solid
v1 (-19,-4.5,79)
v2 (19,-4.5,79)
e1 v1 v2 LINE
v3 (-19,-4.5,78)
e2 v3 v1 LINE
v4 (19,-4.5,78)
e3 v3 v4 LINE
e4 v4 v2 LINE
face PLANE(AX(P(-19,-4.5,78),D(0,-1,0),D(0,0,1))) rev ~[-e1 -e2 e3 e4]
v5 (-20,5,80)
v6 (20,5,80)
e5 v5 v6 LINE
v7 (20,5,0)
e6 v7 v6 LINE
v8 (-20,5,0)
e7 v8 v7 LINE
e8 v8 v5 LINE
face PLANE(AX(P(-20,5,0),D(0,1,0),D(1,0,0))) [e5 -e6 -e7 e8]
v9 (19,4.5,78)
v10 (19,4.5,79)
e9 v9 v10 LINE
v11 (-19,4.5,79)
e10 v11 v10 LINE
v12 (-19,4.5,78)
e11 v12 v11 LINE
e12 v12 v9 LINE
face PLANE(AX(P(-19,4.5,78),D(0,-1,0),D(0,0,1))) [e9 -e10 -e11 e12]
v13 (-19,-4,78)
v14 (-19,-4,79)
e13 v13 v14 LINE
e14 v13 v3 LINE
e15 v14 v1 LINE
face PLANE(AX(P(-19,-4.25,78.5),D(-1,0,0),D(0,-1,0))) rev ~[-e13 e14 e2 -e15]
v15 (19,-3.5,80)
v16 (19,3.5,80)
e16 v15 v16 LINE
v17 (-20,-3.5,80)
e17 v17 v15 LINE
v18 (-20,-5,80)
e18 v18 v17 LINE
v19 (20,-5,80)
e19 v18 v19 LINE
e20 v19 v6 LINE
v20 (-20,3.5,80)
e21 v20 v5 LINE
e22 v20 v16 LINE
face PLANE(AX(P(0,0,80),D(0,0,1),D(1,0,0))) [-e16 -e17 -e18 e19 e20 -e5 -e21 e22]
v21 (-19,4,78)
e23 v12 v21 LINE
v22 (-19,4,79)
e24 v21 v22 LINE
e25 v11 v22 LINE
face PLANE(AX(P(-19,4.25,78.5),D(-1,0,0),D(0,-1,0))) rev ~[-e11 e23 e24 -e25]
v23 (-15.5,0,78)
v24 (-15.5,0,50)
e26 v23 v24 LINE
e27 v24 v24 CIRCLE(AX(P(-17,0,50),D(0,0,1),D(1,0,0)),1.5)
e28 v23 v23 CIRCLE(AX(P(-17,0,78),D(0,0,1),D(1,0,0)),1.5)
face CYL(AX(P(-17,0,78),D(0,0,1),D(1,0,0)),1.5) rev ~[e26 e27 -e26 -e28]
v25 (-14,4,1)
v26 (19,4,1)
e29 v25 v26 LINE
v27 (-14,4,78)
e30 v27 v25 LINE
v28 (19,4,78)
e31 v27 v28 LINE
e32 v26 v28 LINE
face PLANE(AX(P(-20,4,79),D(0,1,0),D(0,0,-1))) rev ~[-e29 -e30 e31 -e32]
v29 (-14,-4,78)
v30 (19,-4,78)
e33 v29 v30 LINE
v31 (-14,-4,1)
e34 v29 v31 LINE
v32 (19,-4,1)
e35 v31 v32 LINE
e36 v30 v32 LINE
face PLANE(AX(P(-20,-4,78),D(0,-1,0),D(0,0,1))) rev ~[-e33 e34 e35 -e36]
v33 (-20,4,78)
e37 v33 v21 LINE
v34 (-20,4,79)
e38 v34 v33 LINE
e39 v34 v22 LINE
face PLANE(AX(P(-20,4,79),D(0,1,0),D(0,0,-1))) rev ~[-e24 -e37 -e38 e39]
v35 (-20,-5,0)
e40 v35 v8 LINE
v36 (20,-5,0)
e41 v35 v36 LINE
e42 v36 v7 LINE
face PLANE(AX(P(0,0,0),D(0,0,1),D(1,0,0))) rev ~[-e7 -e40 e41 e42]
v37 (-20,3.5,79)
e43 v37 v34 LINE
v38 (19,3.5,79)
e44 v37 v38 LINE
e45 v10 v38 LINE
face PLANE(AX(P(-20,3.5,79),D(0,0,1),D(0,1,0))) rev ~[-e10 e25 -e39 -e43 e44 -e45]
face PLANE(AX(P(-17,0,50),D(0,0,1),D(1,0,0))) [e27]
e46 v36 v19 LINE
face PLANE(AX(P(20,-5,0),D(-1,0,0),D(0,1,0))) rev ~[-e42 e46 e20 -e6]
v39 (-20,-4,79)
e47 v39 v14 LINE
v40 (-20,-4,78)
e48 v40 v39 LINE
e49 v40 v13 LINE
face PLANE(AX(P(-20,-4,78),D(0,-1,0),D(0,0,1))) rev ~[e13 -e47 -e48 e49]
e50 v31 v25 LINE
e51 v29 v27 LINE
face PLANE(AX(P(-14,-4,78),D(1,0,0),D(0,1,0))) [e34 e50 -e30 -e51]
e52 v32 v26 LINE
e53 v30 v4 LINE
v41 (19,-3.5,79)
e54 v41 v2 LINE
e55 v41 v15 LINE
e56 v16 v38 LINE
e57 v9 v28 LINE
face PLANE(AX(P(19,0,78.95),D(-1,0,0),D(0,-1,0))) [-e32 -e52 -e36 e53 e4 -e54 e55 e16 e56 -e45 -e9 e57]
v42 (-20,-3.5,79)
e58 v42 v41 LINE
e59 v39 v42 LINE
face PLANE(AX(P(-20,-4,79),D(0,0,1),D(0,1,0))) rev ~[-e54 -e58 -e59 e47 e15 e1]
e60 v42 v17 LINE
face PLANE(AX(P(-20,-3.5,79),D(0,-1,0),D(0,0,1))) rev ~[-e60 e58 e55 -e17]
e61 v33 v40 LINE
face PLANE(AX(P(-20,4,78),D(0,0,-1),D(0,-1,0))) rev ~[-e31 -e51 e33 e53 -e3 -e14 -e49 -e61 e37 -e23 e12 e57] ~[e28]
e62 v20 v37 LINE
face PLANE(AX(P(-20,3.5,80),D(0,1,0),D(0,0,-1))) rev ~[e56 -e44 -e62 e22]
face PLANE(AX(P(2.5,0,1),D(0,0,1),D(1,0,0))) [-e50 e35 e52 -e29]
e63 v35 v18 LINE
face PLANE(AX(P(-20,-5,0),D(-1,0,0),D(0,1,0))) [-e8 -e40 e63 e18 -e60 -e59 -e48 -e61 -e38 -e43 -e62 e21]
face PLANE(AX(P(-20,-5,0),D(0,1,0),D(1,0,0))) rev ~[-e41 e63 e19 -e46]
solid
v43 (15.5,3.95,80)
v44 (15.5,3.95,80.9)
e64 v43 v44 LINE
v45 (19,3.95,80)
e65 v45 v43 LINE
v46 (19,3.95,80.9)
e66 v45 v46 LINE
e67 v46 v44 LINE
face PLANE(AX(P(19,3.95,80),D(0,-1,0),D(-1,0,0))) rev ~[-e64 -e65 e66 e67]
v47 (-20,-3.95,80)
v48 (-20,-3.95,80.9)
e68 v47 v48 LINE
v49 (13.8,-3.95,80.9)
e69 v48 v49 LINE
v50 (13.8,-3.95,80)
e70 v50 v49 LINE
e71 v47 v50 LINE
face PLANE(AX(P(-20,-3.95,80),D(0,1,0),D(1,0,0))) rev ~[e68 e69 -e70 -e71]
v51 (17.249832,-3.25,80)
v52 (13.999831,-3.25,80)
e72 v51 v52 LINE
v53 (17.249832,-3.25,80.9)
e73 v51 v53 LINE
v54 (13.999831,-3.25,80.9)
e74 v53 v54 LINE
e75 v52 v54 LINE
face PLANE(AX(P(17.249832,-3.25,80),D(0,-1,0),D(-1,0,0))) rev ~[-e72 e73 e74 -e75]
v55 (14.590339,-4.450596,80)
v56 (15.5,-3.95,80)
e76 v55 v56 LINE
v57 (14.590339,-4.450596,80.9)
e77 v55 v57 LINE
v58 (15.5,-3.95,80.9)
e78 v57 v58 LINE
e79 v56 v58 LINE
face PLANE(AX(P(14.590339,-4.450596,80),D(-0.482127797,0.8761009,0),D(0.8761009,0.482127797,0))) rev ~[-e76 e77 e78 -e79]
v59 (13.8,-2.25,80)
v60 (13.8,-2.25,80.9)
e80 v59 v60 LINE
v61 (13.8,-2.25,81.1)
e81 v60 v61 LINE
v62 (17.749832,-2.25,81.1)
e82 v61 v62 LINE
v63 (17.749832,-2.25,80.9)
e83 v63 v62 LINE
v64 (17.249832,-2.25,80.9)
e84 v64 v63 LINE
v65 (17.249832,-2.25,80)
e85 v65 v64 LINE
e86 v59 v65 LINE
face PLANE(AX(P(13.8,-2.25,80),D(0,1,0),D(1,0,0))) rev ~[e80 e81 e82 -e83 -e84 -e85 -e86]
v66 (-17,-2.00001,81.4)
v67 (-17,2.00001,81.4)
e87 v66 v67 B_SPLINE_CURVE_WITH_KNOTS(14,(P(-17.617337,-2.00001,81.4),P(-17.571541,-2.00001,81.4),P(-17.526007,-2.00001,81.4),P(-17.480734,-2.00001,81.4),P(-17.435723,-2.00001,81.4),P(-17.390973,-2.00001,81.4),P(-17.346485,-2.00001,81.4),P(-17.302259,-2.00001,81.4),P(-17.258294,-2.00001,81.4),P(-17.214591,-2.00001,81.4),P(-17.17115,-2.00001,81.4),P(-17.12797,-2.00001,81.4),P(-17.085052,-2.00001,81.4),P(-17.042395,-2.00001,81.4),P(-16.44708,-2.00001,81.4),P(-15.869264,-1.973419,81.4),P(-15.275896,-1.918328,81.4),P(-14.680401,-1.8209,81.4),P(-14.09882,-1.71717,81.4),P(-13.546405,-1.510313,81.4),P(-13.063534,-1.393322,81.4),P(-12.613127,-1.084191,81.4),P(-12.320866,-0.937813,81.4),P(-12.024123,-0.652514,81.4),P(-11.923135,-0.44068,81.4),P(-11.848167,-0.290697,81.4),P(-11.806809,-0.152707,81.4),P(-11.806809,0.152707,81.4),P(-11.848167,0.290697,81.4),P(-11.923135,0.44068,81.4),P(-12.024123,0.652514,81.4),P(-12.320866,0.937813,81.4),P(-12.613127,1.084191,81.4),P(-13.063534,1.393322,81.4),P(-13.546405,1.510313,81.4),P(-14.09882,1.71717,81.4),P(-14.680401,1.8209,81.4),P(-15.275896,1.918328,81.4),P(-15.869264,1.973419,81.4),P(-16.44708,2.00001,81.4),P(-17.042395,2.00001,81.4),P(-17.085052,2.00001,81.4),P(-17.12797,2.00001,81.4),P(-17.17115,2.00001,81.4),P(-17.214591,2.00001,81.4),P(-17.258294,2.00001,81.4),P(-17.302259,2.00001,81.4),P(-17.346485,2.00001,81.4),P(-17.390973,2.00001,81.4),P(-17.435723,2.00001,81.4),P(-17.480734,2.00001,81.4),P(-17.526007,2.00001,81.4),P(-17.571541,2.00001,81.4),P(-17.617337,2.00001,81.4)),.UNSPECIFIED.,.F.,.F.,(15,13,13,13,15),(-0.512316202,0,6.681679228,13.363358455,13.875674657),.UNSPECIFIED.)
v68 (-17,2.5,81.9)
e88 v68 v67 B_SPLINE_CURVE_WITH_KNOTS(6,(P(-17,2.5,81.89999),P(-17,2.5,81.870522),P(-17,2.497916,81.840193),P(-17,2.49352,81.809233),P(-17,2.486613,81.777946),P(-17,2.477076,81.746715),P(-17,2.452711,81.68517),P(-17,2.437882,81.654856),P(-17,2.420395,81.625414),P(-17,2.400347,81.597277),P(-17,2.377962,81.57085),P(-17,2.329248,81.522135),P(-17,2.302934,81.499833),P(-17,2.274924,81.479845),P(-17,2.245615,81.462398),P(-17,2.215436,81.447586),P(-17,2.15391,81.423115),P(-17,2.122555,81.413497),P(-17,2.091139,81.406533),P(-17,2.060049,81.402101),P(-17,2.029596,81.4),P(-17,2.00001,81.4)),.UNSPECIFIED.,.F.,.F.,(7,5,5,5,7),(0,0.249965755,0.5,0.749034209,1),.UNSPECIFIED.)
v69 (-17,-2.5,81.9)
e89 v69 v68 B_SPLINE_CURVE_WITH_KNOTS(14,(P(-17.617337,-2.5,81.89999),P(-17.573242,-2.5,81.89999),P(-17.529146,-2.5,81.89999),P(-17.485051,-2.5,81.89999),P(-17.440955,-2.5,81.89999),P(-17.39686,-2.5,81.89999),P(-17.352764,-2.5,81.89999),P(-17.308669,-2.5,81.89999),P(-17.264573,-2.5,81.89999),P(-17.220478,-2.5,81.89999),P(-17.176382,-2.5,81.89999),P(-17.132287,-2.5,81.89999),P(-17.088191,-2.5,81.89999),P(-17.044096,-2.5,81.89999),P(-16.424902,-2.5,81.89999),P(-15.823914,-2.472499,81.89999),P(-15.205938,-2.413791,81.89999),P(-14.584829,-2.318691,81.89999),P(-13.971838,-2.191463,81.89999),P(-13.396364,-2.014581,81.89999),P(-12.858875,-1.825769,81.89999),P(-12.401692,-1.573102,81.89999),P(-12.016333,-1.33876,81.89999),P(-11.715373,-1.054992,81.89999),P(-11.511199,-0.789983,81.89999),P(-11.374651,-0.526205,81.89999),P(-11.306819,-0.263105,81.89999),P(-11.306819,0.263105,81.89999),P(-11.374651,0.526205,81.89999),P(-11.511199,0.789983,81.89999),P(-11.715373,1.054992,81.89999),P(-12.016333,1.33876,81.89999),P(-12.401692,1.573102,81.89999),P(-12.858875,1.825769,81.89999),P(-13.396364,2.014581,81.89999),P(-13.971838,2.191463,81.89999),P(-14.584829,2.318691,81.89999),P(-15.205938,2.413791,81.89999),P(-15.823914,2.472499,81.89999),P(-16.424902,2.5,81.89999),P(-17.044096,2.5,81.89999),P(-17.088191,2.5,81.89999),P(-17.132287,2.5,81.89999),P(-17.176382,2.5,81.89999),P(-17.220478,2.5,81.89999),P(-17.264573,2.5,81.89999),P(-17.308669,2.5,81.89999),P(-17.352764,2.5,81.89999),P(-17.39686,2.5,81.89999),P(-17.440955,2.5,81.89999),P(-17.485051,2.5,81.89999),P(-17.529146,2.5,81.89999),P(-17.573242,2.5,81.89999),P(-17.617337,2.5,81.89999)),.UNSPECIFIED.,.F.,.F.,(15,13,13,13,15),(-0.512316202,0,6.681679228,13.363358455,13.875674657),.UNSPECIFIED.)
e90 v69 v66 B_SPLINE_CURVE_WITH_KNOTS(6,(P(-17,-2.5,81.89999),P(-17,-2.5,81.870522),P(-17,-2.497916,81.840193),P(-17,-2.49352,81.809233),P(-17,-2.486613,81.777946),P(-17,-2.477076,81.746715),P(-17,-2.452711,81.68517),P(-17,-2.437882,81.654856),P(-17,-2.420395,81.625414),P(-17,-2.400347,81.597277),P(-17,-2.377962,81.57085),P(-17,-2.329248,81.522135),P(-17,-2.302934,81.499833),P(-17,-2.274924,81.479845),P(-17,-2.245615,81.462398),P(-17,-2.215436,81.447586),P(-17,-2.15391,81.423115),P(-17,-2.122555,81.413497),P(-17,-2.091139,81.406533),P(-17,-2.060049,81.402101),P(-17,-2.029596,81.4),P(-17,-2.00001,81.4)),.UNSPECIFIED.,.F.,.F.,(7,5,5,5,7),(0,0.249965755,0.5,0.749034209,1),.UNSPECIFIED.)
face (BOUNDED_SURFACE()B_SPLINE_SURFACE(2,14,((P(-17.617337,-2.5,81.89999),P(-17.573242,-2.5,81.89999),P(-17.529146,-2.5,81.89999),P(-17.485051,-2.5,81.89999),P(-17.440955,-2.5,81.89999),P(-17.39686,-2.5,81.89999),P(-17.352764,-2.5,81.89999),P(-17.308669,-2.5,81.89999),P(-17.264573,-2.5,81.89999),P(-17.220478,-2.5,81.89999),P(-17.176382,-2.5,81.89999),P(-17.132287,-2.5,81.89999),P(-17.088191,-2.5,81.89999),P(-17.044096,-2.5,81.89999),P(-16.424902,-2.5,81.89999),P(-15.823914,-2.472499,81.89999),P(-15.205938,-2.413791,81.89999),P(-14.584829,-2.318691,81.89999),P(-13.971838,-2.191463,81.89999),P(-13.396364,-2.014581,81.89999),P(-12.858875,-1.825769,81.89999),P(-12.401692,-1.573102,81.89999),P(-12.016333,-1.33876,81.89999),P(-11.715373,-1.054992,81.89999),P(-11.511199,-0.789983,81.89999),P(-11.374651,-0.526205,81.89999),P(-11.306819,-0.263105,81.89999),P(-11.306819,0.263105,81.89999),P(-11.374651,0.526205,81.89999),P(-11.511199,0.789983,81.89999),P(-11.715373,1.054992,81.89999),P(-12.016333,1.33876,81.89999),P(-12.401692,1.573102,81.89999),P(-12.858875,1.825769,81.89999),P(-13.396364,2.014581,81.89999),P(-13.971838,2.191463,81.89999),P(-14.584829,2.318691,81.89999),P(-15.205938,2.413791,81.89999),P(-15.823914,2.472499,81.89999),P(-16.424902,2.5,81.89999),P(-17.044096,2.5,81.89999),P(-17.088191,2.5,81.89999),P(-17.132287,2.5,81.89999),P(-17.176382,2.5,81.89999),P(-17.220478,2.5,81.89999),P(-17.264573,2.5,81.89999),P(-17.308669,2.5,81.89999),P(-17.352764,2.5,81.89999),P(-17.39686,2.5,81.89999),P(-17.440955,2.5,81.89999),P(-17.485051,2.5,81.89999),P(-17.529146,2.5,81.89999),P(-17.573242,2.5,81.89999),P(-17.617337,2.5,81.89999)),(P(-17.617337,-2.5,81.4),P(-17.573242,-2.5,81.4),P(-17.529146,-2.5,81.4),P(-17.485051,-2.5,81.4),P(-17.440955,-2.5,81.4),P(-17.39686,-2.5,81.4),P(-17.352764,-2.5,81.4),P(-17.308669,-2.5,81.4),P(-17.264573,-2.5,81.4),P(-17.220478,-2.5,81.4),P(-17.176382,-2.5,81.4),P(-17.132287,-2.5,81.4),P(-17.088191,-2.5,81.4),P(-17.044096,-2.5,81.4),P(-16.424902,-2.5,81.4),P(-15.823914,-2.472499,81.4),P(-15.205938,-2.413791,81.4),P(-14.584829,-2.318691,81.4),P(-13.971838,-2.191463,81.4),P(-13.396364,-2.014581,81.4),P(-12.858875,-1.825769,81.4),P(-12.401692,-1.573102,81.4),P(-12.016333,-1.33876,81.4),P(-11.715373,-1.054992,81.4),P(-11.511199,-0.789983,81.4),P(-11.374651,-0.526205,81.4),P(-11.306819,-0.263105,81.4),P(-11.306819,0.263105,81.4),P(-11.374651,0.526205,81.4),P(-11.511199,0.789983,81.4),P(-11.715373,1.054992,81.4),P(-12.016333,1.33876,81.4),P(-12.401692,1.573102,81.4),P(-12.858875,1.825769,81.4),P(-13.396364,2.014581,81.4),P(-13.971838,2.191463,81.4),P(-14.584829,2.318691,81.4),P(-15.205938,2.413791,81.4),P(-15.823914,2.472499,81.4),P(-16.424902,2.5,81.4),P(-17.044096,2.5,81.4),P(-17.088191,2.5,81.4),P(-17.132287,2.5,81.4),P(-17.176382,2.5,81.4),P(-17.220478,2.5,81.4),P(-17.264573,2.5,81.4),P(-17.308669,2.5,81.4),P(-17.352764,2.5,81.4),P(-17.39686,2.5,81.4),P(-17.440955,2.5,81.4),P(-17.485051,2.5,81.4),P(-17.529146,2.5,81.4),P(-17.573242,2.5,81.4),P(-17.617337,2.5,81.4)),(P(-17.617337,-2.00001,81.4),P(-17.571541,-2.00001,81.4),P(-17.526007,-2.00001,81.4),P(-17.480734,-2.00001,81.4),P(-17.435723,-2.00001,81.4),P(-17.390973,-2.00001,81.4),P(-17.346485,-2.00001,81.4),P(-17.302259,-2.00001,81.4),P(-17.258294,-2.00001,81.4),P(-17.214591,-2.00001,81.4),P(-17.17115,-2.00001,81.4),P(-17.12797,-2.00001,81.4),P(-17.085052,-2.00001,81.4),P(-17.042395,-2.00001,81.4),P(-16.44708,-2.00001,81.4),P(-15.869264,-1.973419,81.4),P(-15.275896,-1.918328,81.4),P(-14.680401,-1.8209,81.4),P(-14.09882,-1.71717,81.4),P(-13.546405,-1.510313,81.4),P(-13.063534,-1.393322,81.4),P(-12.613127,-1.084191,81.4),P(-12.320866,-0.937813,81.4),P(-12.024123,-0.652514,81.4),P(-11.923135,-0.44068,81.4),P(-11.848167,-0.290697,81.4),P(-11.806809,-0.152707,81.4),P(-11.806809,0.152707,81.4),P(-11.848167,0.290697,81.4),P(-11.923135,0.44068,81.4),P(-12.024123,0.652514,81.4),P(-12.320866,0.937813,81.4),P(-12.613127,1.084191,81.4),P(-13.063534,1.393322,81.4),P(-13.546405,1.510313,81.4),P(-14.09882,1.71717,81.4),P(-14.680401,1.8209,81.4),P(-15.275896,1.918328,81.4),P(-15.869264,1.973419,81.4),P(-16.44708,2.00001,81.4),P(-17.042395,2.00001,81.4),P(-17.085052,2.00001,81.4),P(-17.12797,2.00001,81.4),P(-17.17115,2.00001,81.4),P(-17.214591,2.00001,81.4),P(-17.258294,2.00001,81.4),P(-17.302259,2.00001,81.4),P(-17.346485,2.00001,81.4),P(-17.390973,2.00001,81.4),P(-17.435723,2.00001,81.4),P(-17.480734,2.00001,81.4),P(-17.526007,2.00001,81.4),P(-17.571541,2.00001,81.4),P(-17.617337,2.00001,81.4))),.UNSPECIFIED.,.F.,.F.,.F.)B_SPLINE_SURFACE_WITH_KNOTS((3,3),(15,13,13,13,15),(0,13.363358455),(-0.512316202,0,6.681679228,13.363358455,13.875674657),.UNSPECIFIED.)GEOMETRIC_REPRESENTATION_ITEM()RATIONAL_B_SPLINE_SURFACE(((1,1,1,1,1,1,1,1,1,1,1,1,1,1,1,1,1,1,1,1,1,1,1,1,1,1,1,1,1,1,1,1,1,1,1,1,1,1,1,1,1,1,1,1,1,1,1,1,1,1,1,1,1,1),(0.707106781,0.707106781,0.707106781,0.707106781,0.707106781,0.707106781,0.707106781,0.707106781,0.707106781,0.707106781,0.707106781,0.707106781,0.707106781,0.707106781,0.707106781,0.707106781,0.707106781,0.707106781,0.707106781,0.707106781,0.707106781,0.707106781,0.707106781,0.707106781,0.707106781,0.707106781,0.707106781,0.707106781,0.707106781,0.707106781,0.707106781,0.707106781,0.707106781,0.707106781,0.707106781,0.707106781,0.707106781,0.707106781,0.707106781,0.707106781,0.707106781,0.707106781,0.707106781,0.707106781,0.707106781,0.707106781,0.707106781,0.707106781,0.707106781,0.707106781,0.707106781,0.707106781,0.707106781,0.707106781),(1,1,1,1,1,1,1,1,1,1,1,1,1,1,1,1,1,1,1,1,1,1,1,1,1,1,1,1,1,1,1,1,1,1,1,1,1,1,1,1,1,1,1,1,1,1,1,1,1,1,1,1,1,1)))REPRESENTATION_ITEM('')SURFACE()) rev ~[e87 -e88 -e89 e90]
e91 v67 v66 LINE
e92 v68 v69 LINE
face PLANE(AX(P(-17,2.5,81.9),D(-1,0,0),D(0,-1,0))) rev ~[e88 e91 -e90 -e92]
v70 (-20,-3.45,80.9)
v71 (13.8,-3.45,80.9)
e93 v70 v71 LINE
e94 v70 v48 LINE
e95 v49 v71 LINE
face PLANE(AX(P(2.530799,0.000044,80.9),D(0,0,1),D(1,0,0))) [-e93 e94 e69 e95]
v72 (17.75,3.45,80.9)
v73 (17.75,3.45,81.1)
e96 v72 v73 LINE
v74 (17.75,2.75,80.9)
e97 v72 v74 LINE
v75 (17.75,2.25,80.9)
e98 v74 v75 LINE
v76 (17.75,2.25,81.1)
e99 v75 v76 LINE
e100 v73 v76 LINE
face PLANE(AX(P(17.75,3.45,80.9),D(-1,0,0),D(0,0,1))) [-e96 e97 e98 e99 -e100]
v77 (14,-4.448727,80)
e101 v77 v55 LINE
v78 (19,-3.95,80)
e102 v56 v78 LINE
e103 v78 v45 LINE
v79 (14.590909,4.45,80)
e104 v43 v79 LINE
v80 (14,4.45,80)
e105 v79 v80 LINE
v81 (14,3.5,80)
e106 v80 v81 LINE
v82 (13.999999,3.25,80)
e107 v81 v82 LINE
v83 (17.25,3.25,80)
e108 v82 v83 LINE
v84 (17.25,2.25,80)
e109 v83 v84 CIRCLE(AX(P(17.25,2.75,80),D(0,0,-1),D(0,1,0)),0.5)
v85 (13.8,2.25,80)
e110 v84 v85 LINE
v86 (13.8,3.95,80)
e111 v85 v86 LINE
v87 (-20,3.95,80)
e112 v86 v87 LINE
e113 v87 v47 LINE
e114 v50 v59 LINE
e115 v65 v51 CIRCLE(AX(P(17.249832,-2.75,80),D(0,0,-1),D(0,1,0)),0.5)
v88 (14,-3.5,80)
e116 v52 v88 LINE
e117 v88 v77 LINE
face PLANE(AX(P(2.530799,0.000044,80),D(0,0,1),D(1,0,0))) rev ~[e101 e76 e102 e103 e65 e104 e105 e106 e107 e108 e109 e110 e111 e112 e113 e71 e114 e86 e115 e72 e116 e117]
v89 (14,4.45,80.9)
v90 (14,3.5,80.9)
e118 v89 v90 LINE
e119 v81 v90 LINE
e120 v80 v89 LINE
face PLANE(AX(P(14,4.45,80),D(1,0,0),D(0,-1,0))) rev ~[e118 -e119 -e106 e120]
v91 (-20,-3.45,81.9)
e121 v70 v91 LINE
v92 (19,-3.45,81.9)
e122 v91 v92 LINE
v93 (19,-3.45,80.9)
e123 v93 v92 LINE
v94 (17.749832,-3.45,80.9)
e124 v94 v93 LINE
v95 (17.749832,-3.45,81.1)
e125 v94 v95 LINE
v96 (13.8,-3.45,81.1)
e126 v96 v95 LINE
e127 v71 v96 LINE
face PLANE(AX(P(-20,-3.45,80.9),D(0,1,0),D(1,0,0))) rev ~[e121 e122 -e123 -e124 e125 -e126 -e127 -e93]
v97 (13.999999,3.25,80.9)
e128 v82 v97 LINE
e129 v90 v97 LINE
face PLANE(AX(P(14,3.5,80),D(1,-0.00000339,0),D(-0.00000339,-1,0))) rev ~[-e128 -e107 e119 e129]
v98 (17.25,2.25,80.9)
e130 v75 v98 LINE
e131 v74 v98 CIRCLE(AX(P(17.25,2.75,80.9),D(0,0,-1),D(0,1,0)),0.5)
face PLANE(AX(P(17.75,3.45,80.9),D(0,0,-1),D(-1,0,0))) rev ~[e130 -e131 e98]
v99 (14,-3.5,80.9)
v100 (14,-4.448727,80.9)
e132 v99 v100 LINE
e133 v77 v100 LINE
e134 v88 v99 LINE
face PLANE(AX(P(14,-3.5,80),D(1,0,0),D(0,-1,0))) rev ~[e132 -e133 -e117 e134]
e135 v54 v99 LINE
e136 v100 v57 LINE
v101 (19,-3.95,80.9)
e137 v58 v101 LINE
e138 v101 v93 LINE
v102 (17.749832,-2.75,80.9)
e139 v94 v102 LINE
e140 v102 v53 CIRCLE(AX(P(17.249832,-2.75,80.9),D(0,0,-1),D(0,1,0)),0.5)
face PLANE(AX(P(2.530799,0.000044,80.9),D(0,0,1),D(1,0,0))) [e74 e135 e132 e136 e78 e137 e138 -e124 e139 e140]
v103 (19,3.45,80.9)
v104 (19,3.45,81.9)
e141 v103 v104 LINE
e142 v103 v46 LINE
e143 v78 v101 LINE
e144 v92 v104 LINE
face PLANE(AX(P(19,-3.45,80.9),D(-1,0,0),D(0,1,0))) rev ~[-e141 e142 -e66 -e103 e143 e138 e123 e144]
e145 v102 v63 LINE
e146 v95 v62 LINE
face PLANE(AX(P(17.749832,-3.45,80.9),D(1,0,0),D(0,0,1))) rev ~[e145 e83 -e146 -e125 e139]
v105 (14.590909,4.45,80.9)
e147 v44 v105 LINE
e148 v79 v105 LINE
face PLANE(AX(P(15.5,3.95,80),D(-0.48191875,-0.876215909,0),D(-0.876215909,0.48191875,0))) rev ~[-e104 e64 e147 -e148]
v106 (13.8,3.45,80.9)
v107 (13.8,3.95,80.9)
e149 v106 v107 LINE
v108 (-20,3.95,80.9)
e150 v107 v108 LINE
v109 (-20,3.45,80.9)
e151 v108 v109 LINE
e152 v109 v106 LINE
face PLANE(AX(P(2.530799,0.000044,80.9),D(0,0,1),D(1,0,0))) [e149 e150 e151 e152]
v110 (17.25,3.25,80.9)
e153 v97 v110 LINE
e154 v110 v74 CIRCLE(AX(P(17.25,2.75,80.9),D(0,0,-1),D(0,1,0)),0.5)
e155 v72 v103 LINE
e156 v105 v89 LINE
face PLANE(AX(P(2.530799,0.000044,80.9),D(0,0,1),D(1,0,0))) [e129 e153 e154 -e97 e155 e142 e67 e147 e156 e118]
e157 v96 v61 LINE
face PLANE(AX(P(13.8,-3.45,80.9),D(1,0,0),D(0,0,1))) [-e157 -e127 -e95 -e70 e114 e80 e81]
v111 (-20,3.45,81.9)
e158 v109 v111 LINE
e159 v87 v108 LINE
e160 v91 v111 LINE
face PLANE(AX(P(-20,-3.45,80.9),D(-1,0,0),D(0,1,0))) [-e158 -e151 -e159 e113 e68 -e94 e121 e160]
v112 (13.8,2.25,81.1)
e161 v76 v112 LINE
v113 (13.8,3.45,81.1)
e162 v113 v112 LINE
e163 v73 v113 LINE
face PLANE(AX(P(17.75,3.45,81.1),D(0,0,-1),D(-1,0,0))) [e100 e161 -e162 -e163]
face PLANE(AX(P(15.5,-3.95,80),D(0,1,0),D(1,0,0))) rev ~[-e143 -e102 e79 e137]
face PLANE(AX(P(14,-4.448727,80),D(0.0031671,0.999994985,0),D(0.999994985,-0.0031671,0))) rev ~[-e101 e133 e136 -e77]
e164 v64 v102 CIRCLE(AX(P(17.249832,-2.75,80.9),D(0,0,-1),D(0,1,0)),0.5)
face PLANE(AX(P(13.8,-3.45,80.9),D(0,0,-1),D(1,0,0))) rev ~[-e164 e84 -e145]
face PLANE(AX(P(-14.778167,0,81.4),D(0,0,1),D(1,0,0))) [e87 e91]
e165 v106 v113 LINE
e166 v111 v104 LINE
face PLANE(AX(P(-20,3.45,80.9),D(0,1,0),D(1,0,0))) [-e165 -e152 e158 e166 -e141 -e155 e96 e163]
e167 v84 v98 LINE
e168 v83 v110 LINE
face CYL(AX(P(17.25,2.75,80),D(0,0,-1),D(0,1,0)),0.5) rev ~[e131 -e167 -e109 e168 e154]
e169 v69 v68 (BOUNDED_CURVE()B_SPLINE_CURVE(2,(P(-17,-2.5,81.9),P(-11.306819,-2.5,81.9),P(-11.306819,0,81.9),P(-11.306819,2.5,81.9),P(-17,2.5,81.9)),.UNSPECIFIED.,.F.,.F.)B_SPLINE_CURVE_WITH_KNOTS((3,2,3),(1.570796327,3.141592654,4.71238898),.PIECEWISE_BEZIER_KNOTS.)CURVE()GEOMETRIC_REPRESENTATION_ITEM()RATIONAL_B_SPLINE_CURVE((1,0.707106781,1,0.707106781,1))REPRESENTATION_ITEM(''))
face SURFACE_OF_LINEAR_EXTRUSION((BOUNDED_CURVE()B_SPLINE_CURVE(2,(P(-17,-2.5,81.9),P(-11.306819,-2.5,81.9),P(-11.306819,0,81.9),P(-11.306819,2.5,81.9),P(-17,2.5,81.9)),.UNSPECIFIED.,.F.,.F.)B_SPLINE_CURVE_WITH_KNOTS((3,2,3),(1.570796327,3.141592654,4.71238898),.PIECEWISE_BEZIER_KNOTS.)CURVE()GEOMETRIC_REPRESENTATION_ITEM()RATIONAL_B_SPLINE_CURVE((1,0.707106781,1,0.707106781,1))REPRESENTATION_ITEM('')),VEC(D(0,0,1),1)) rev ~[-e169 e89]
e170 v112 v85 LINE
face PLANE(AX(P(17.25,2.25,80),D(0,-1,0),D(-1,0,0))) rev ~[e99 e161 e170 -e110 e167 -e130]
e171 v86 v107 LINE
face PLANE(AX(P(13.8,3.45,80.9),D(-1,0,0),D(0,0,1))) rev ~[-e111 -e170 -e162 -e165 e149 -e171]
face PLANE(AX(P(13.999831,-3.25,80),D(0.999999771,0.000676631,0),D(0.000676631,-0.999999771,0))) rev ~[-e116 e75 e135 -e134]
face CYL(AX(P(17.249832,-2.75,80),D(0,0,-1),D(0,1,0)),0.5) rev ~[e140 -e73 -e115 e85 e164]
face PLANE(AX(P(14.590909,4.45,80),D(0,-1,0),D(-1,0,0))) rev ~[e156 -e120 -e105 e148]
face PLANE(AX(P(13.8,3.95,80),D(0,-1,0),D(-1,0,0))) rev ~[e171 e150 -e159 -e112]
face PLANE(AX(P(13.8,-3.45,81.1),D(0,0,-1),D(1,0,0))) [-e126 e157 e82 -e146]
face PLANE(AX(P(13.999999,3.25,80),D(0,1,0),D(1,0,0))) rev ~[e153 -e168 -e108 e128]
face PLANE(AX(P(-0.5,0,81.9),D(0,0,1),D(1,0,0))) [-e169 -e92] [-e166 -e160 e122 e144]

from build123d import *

# Parameters (mm, degrees)
F0_W      = 40
F0_H      = 10
F1_DEPTH  = 80
F3_START  = -2
F2_W      = 33
F2_H      = 8
F3_DEPTH  = 77
F5_START  = -2
F4_R      = 1.5
F5_DEPTH  = 28
F7_DEPTH  = 39
F9_START  = -1
F8_W      = 0.5
F8_H      = 1
F9_DEPTH  = 38
F11_DEPTH = 0.9
F12_W     = 39
F12_H     = 6.9
F13_DEPTH = 1
F14_W     = 3.9498324515
F14_H     = 0.2
F15_DEPTH = 1.2
F16_W     = 3.95
F16_H     = 0.2
F17_DEPTH = 1.2
F19_DEPTH = 0.5
F20_R     = 0.49999


# Not quite as in the source:
# - a fillet or chamfer is up to 0.001 mm smaller than in the source, because OpenCascade refuses the exact size


with BuildPart() as f1:
    # F0 (on Top) → F1 (new body)
    with BuildSketch(Plane.XY):
        Rectangle(F0_W, F0_H)
    extrude(amount=F1_DEPTH)

    # F2 (on face) → F3 (cut)
    with BuildSketch(Plane.XY.offset(80).offset(F3_START)):
        with Locations((2.5, 0)):
            Rectangle(F2_W, F2_H)
    extrude(amount=-F3_DEPTH, mode=Mode.SUBTRACT)

    # F4 (on face) → F5 (cut)
    with BuildSketch(Plane.XY.offset(80).offset(F5_START)):
        with Locations((-17, 0)):
            Circle(F4_R)
    extrude(amount=-F5_DEPTH, mode=Mode.SUBTRACT)

    # F6 (on face) → F7 (cut)
    with BuildSketch(Plane(origin=(-20, 0, 0), x_dir=(0, -1, 0), z_dir=(-1, 0, 0))):
        Polygon((3.5, 79), (3.5, 80), (-3.5, 80), (-3.5, 79), (-4, 79), (-4, 78), (4, 78), (4, 79), align=None)
    extrude(amount=-F7_DEPTH, mode=Mode.SUBTRACT)

    # F8 (on face) → F9 (cut)
    with BuildSketch(Plane(origin=(-20, 0, 0), x_dir=(0, -1, 0), z_dir=(-1, 0, 0)).offset(F9_START)):
        with Locations((4.25, 78.5)):
            Rectangle(F8_W, F8_H)
        with Locations((-4.25, 78.5)):
            Rectangle(F8_W, F8_H)
    extrude(amount=-F9_DEPTH, mode=Mode.SUBTRACT)


with BuildPart() as f11:
    # F10 (on face) → F11 (new body)
    with BuildSketch(Plane.XY.offset(80)):
        with BuildLine():
            Line((19, -3.95), (19, -3.5))
            Line((19, -3.5), (19, 3.5))
            Line((19, 3.5), (19, 3.95))
            Line((19, 3.95), (15.5, 3.95))
            Line((15.5, 3.95), (14.5909090909, 4.45))
            Line((14.5909090909, 4.45), (14, 4.45))
            Line((14, 4.45), (14, 3.95))
            Line((14, 3.95), (14, 3.5000000002))
            Line((14, 3.5000000002), (13.9999991525, 3.25))
            Line((13.9999991525, 3.25), (17.25, 3.25))
            ThreePointArc((17.25, 3.25), (17.75, 2.75), (17.25, 2.25))
            Line((17.25, 2.25), (13.8, 2.25))
            Line((13.8, 2.25), (13.8, 3.5))
            Line((13.8, 3.5), (13.8, 3.95))
            Line((13.8, 3.95), (-20, 3.95))
            Line((-20, 3.95), (-20, -3.95))
            Line((-20, -3.95), (13.8, -3.95))
            Line((13.8, -3.95), (13.8, -3.5))
            Line((13.8, -3.5), (13.8, -2.25))
            Line((13.8, -2.25), (17.2498324515, -2.25))
            ThreePointArc((17.2498324515, -2.25), (17.7498324515, -2.75), (17.2498324515, -3.25))
            Line((17.2498324515, -3.25), (13.9998308422, -3.25))
            Line((13.9998308422, -3.25), (14, -3.5))
            Line((14, -3.5), (14, -3.95))
            Line((14, -3.95), (14, -4.4487268106))
            Line((14, -4.4487268106), (14.5903386392, -4.4505964817))
            Line((14.5903386392, -4.4505964817), (15.5, -3.95))
            Line((15.5, -3.95), (19, -3.95))
        make_face()
    extrude(amount=F11_DEPTH)

    # F12 (on face) → F13 (join)
    with BuildSketch(Plane.XY.offset(80.9)):
        with Locations((-0.5, 0)):
            Rectangle(F12_W, F12_H)
    extrude(amount=F13_DEPTH)

    # F14 (on face) → F15 (cut)
    with BuildSketch(Plane.XZ.offset(3.45)):
        with Locations((15.7749162257, 81)):
            Rectangle(F14_W, F14_H)
    extrude(amount=-F15_DEPTH, mode=Mode.SUBTRACT)

    # F16 (on face) → F17 (cut)
    with BuildSketch(Plane(origin=(0, 3.45, 0), x_dir=(-1, 0, 0), z_dir=(0, 1, 0))):
        with Locations((-15.775, 81)):
            Rectangle(F16_W, F16_H)
    extrude(amount=-F17_DEPTH, mode=Mode.SUBTRACT)

    # F18 (on face) → F19 (cut)
    with BuildSketch(Plane.XY.offset(81.9)):
        with BuildLine():
            Line((-17, 2.5), (-17, 0))
            Line((-17, 0), (-17, -2.5))
            add(Edge.make_bspline(
                [(-17, -2.5), (-11.3068194012, -2.5), (-11.3068194012, 0), (-11.3068194012, 2.5), (-17, 2.5)],
                knots=[1.5707963268, 1.5707963268, 1.5707963268, 3.1415926536, 3.1415926536, 4.7123889804, 4.7123889804, 4.7123889804], degree=2, weights=[1, 0.7071067812, 1, 0.7071067812, 1]))
        make_face()
    extrude(amount=-F19_DEPTH, mode=Mode.SUBTRACT)

    # F20 (radius 0.5 in the source; OpenCascade refuses exactly that, so slightly less here)
    f20_edges = [f11.edges().sort_by_distance(p)[0] for p in [
        (-11.306819, 0, 81.4),
    ]]
    fillet(f20_edges, radius=F20_R)


solid = Compound([f1.part, f11.part])
